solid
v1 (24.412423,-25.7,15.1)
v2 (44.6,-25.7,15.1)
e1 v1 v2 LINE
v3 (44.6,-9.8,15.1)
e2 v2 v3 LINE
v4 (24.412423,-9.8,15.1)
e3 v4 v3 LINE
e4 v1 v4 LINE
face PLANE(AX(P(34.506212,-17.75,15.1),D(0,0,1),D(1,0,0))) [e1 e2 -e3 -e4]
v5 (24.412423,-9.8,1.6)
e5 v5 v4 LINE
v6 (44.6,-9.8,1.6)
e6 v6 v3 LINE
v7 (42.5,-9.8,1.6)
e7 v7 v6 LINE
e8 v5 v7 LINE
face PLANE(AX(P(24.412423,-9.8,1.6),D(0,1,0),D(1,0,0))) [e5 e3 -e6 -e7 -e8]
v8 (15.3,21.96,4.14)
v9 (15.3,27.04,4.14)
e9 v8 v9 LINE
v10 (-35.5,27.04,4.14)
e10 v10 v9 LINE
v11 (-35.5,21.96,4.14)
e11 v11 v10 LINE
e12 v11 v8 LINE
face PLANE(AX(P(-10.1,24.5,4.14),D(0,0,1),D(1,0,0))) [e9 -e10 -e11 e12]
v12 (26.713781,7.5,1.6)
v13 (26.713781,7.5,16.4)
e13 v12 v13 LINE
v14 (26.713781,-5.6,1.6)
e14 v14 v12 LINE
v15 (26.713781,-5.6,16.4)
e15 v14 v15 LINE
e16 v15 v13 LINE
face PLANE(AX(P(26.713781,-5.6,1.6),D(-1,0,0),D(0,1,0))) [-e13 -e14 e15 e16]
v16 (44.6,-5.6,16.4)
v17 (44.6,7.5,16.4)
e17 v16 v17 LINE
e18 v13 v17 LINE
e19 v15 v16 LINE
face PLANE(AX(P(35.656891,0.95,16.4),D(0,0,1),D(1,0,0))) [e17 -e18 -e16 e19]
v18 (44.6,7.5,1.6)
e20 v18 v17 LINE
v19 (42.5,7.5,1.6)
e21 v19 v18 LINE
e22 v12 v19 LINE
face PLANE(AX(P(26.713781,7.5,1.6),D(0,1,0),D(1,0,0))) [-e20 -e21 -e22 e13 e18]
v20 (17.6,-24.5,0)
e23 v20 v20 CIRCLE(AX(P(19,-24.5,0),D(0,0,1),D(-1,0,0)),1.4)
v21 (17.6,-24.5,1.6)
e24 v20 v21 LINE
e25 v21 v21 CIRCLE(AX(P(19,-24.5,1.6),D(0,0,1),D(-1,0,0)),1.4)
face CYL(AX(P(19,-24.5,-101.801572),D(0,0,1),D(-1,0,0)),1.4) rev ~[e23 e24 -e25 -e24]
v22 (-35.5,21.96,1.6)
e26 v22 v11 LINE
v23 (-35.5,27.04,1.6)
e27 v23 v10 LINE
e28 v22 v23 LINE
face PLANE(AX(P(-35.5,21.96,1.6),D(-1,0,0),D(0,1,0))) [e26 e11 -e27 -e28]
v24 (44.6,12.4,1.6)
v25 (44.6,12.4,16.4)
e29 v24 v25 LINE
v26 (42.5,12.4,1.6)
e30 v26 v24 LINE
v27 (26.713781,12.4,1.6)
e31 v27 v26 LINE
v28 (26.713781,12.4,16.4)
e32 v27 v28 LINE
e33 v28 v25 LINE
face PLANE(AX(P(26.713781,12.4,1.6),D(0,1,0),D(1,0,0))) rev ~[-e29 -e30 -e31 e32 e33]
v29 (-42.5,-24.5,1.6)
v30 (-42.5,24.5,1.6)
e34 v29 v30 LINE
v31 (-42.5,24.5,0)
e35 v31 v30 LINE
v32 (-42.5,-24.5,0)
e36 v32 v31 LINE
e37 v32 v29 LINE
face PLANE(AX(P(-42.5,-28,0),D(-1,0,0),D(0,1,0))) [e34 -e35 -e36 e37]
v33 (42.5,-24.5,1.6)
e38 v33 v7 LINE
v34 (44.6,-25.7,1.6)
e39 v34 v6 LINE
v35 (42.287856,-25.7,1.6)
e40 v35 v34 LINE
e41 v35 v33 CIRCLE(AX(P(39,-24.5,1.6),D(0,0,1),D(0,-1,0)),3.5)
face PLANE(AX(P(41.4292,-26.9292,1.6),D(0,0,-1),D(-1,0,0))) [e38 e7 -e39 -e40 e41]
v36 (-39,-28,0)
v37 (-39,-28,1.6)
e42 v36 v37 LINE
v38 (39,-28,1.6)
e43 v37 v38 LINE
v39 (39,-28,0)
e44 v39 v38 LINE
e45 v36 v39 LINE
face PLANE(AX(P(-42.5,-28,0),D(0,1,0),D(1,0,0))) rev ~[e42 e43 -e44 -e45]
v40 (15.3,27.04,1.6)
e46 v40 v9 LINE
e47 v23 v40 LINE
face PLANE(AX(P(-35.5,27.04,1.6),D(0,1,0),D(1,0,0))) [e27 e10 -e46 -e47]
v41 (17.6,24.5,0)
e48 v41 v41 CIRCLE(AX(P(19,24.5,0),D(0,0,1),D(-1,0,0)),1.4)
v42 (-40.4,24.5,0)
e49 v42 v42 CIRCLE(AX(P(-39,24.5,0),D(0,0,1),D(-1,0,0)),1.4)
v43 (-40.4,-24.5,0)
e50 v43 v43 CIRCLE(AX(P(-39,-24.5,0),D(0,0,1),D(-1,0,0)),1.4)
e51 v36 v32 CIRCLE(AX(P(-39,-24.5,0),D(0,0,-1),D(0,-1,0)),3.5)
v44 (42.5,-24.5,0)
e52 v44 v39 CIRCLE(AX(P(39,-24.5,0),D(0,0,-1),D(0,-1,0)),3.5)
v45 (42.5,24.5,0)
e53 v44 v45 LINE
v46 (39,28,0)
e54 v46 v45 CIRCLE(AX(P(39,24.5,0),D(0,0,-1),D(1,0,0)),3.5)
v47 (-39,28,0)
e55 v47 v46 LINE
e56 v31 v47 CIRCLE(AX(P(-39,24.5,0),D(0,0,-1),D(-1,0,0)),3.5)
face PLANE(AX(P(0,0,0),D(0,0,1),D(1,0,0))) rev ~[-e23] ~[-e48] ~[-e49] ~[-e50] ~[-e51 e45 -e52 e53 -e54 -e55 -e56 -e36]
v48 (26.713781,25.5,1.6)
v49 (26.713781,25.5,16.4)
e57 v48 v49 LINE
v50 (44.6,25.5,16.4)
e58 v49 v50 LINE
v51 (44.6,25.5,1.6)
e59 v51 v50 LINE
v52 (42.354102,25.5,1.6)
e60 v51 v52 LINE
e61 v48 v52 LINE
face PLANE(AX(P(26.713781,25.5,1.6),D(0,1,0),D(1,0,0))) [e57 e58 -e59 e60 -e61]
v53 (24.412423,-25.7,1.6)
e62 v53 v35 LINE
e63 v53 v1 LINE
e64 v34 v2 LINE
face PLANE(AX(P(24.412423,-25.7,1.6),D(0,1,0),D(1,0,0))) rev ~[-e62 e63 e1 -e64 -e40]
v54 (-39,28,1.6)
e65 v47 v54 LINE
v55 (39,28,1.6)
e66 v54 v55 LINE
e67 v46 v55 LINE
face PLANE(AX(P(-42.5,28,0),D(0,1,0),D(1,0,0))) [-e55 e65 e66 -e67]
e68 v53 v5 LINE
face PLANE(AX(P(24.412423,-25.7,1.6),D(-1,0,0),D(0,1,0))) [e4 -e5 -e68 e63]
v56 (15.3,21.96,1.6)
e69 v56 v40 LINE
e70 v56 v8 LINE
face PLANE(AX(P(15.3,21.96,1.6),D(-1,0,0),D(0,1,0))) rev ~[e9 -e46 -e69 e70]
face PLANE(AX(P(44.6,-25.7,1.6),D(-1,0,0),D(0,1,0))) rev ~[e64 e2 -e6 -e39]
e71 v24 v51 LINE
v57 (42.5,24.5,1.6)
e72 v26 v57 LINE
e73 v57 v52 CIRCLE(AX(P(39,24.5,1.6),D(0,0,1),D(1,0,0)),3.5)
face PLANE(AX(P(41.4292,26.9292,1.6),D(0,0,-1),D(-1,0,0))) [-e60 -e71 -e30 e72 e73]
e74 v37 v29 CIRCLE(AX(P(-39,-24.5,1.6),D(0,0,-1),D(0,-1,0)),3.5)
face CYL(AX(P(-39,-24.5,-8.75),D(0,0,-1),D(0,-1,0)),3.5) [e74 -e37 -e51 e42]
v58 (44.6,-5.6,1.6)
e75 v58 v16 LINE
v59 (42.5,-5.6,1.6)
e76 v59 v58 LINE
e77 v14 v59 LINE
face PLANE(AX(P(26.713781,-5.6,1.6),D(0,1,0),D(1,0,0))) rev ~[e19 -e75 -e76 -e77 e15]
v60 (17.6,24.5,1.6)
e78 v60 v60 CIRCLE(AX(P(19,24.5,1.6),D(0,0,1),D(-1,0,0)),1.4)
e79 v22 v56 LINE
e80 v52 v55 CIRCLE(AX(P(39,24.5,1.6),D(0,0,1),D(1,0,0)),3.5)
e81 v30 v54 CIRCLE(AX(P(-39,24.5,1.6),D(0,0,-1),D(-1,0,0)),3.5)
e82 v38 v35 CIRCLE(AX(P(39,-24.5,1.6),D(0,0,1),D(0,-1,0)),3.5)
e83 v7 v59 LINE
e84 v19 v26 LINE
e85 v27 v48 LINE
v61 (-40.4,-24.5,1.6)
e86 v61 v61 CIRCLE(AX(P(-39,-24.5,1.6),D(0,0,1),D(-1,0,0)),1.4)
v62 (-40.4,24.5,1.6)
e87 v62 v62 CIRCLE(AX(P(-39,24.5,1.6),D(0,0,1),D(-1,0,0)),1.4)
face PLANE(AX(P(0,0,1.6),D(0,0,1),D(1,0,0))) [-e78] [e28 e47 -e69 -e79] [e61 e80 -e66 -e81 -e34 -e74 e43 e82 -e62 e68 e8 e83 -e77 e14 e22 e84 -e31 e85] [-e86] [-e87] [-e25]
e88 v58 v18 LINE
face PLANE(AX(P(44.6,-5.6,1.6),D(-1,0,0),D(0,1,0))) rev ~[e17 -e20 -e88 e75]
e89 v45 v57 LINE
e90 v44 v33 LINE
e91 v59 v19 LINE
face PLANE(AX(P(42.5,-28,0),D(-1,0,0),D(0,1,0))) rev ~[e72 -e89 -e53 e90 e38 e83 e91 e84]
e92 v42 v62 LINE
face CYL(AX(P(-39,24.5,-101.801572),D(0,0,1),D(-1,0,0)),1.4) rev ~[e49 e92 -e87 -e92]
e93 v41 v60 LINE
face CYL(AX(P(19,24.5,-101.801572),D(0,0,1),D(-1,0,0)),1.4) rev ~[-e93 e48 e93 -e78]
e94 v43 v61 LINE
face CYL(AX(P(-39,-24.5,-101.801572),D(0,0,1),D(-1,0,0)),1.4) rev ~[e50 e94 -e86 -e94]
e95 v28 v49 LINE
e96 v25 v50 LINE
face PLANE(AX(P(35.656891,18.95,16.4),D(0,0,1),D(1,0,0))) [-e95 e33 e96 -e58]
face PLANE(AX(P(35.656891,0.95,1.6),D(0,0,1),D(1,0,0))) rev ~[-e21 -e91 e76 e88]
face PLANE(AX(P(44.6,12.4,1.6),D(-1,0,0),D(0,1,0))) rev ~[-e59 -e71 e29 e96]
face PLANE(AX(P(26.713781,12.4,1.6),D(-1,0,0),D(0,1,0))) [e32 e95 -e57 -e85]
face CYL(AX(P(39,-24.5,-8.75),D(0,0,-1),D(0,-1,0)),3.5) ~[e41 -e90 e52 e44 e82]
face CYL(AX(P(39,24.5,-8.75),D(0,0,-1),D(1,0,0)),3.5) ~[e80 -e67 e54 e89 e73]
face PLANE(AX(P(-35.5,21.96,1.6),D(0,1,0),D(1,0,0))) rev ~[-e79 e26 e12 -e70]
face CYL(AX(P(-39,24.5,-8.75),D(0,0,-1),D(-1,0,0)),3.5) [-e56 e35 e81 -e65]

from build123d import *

# Parameters (mm, degrees)
F0_W        = 85
F0_H        = 56
F1_DEPTH    = 1.6
F2_D        = 2.8
F3_W        = 50.8
F3_H        = 5.08
F4_DEPTH    = 2.54
F5_W        = 17.8862189412
F5_H        = 13.1
F6_DEPTH    = 14.8
F7_W        = 20.1875766277
F7_H        = 15.9
F8_DEPTH    = 13.5
F9_T1_DEPTH = 19.1
F9_T3_DEPTH = 10.35


# Not quite as in the source:
# - a fillet or chamfer that OpenCascade refuses, or shapes differently, is made with other operations: its cross-section is extruded or revolved along the edge and cut away or added


with BuildPart() as f1:
    # F0 (on Top) → F1 (new body)
    with BuildSketch(Plane.XY):
        Rectangle(F0_W, F0_H)
    extrude(amount=F1_DEPTH)

    # F2 (through all)
    with Locations(Plane(origin=(0, 0, 0), x_dir=(1, 0, 0), z_dir=(0, 0, -1))):
        with Locations((-39, -24.5), (19, -24.5), (19, 24.5), (-39, 24.5)):
            Hole(F2_D / 2)

    # F3 (on face) → F4 (join)
    with BuildSketch(Plane.XY.offset(1.6)):
        with Locations((-10.1, 24.5)):
            Rectangle(F3_W, F3_H)
    extrude(amount=F4_DEPTH)

    # F5 (on face) → F6 (join)
    with BuildSketch(Plane.XY.offset(1.6)):
        with Locations((35.6568905294, 18.95)):
            Rectangle(F5_W, F5_H)
        with Locations((35.6568905294, 0.95)):
            Rectangle(F5_W, F5_H)
    extrude(amount=F6_DEPTH)

    # F7 (on face) → F8 (join)
    with BuildSketch(Plane.XY.offset(1.6)):
        with Locations((34.5062116861, -17.75)):
            Rectangle(F7_W, F7_H)
    extrude(amount=F8_DEPTH)

    # F9: fillet of radius 3.5 on 4 edges, made by hand

    # F9_s2 → F9_t1 (cut)
    with BuildSketch(Plane.XY.offset(-8.75)):
        with BuildLine():
            ThreePointArc((-39, -28), (-41.4748737342, -26.9748737342), (-42.5, -24.5))
            Line((-42.5, -24.5), (-42.5, -28))
            Line((-42.5, -28), (-39, -28))
        make_face()
        with BuildLine():
            ThreePointArc((-42.5, 24.5), (-41.4748737342, 26.9748737342), (-39, 28))
            Line((-39, 28), (-42.5, 28))
            Line((-42.5, 28), (-42.5, 24.5))
        make_face()
    extrude(amount=F9_T1_DEPTH, mode=Mode.SUBTRACT)

    # F9_s4 → F9_t3 (cut)
    with BuildSketch(Plane.XY.offset(-8.75)):
        with BuildLine():
            ThreePointArc((39, -28), (41.4748737342, -26.9748737342), (42.5, -24.5))
            Line((42.5, -24.5), (42.5, -28))
            Line((42.5, -28), (39, -28))
        make_face()
        with BuildLine():
            ThreePointArc((42.5, 24.5), (41.4748737342, 26.9748737342), (39, 28))
            Line((39, 28), (42.5, 28))
            Line((42.5, 28), (42.5, 24.5))
        make_face()
    extrude(amount=F9_T3_DEPTH, mode=Mode.SUBTRACT)


solid = f1.part
